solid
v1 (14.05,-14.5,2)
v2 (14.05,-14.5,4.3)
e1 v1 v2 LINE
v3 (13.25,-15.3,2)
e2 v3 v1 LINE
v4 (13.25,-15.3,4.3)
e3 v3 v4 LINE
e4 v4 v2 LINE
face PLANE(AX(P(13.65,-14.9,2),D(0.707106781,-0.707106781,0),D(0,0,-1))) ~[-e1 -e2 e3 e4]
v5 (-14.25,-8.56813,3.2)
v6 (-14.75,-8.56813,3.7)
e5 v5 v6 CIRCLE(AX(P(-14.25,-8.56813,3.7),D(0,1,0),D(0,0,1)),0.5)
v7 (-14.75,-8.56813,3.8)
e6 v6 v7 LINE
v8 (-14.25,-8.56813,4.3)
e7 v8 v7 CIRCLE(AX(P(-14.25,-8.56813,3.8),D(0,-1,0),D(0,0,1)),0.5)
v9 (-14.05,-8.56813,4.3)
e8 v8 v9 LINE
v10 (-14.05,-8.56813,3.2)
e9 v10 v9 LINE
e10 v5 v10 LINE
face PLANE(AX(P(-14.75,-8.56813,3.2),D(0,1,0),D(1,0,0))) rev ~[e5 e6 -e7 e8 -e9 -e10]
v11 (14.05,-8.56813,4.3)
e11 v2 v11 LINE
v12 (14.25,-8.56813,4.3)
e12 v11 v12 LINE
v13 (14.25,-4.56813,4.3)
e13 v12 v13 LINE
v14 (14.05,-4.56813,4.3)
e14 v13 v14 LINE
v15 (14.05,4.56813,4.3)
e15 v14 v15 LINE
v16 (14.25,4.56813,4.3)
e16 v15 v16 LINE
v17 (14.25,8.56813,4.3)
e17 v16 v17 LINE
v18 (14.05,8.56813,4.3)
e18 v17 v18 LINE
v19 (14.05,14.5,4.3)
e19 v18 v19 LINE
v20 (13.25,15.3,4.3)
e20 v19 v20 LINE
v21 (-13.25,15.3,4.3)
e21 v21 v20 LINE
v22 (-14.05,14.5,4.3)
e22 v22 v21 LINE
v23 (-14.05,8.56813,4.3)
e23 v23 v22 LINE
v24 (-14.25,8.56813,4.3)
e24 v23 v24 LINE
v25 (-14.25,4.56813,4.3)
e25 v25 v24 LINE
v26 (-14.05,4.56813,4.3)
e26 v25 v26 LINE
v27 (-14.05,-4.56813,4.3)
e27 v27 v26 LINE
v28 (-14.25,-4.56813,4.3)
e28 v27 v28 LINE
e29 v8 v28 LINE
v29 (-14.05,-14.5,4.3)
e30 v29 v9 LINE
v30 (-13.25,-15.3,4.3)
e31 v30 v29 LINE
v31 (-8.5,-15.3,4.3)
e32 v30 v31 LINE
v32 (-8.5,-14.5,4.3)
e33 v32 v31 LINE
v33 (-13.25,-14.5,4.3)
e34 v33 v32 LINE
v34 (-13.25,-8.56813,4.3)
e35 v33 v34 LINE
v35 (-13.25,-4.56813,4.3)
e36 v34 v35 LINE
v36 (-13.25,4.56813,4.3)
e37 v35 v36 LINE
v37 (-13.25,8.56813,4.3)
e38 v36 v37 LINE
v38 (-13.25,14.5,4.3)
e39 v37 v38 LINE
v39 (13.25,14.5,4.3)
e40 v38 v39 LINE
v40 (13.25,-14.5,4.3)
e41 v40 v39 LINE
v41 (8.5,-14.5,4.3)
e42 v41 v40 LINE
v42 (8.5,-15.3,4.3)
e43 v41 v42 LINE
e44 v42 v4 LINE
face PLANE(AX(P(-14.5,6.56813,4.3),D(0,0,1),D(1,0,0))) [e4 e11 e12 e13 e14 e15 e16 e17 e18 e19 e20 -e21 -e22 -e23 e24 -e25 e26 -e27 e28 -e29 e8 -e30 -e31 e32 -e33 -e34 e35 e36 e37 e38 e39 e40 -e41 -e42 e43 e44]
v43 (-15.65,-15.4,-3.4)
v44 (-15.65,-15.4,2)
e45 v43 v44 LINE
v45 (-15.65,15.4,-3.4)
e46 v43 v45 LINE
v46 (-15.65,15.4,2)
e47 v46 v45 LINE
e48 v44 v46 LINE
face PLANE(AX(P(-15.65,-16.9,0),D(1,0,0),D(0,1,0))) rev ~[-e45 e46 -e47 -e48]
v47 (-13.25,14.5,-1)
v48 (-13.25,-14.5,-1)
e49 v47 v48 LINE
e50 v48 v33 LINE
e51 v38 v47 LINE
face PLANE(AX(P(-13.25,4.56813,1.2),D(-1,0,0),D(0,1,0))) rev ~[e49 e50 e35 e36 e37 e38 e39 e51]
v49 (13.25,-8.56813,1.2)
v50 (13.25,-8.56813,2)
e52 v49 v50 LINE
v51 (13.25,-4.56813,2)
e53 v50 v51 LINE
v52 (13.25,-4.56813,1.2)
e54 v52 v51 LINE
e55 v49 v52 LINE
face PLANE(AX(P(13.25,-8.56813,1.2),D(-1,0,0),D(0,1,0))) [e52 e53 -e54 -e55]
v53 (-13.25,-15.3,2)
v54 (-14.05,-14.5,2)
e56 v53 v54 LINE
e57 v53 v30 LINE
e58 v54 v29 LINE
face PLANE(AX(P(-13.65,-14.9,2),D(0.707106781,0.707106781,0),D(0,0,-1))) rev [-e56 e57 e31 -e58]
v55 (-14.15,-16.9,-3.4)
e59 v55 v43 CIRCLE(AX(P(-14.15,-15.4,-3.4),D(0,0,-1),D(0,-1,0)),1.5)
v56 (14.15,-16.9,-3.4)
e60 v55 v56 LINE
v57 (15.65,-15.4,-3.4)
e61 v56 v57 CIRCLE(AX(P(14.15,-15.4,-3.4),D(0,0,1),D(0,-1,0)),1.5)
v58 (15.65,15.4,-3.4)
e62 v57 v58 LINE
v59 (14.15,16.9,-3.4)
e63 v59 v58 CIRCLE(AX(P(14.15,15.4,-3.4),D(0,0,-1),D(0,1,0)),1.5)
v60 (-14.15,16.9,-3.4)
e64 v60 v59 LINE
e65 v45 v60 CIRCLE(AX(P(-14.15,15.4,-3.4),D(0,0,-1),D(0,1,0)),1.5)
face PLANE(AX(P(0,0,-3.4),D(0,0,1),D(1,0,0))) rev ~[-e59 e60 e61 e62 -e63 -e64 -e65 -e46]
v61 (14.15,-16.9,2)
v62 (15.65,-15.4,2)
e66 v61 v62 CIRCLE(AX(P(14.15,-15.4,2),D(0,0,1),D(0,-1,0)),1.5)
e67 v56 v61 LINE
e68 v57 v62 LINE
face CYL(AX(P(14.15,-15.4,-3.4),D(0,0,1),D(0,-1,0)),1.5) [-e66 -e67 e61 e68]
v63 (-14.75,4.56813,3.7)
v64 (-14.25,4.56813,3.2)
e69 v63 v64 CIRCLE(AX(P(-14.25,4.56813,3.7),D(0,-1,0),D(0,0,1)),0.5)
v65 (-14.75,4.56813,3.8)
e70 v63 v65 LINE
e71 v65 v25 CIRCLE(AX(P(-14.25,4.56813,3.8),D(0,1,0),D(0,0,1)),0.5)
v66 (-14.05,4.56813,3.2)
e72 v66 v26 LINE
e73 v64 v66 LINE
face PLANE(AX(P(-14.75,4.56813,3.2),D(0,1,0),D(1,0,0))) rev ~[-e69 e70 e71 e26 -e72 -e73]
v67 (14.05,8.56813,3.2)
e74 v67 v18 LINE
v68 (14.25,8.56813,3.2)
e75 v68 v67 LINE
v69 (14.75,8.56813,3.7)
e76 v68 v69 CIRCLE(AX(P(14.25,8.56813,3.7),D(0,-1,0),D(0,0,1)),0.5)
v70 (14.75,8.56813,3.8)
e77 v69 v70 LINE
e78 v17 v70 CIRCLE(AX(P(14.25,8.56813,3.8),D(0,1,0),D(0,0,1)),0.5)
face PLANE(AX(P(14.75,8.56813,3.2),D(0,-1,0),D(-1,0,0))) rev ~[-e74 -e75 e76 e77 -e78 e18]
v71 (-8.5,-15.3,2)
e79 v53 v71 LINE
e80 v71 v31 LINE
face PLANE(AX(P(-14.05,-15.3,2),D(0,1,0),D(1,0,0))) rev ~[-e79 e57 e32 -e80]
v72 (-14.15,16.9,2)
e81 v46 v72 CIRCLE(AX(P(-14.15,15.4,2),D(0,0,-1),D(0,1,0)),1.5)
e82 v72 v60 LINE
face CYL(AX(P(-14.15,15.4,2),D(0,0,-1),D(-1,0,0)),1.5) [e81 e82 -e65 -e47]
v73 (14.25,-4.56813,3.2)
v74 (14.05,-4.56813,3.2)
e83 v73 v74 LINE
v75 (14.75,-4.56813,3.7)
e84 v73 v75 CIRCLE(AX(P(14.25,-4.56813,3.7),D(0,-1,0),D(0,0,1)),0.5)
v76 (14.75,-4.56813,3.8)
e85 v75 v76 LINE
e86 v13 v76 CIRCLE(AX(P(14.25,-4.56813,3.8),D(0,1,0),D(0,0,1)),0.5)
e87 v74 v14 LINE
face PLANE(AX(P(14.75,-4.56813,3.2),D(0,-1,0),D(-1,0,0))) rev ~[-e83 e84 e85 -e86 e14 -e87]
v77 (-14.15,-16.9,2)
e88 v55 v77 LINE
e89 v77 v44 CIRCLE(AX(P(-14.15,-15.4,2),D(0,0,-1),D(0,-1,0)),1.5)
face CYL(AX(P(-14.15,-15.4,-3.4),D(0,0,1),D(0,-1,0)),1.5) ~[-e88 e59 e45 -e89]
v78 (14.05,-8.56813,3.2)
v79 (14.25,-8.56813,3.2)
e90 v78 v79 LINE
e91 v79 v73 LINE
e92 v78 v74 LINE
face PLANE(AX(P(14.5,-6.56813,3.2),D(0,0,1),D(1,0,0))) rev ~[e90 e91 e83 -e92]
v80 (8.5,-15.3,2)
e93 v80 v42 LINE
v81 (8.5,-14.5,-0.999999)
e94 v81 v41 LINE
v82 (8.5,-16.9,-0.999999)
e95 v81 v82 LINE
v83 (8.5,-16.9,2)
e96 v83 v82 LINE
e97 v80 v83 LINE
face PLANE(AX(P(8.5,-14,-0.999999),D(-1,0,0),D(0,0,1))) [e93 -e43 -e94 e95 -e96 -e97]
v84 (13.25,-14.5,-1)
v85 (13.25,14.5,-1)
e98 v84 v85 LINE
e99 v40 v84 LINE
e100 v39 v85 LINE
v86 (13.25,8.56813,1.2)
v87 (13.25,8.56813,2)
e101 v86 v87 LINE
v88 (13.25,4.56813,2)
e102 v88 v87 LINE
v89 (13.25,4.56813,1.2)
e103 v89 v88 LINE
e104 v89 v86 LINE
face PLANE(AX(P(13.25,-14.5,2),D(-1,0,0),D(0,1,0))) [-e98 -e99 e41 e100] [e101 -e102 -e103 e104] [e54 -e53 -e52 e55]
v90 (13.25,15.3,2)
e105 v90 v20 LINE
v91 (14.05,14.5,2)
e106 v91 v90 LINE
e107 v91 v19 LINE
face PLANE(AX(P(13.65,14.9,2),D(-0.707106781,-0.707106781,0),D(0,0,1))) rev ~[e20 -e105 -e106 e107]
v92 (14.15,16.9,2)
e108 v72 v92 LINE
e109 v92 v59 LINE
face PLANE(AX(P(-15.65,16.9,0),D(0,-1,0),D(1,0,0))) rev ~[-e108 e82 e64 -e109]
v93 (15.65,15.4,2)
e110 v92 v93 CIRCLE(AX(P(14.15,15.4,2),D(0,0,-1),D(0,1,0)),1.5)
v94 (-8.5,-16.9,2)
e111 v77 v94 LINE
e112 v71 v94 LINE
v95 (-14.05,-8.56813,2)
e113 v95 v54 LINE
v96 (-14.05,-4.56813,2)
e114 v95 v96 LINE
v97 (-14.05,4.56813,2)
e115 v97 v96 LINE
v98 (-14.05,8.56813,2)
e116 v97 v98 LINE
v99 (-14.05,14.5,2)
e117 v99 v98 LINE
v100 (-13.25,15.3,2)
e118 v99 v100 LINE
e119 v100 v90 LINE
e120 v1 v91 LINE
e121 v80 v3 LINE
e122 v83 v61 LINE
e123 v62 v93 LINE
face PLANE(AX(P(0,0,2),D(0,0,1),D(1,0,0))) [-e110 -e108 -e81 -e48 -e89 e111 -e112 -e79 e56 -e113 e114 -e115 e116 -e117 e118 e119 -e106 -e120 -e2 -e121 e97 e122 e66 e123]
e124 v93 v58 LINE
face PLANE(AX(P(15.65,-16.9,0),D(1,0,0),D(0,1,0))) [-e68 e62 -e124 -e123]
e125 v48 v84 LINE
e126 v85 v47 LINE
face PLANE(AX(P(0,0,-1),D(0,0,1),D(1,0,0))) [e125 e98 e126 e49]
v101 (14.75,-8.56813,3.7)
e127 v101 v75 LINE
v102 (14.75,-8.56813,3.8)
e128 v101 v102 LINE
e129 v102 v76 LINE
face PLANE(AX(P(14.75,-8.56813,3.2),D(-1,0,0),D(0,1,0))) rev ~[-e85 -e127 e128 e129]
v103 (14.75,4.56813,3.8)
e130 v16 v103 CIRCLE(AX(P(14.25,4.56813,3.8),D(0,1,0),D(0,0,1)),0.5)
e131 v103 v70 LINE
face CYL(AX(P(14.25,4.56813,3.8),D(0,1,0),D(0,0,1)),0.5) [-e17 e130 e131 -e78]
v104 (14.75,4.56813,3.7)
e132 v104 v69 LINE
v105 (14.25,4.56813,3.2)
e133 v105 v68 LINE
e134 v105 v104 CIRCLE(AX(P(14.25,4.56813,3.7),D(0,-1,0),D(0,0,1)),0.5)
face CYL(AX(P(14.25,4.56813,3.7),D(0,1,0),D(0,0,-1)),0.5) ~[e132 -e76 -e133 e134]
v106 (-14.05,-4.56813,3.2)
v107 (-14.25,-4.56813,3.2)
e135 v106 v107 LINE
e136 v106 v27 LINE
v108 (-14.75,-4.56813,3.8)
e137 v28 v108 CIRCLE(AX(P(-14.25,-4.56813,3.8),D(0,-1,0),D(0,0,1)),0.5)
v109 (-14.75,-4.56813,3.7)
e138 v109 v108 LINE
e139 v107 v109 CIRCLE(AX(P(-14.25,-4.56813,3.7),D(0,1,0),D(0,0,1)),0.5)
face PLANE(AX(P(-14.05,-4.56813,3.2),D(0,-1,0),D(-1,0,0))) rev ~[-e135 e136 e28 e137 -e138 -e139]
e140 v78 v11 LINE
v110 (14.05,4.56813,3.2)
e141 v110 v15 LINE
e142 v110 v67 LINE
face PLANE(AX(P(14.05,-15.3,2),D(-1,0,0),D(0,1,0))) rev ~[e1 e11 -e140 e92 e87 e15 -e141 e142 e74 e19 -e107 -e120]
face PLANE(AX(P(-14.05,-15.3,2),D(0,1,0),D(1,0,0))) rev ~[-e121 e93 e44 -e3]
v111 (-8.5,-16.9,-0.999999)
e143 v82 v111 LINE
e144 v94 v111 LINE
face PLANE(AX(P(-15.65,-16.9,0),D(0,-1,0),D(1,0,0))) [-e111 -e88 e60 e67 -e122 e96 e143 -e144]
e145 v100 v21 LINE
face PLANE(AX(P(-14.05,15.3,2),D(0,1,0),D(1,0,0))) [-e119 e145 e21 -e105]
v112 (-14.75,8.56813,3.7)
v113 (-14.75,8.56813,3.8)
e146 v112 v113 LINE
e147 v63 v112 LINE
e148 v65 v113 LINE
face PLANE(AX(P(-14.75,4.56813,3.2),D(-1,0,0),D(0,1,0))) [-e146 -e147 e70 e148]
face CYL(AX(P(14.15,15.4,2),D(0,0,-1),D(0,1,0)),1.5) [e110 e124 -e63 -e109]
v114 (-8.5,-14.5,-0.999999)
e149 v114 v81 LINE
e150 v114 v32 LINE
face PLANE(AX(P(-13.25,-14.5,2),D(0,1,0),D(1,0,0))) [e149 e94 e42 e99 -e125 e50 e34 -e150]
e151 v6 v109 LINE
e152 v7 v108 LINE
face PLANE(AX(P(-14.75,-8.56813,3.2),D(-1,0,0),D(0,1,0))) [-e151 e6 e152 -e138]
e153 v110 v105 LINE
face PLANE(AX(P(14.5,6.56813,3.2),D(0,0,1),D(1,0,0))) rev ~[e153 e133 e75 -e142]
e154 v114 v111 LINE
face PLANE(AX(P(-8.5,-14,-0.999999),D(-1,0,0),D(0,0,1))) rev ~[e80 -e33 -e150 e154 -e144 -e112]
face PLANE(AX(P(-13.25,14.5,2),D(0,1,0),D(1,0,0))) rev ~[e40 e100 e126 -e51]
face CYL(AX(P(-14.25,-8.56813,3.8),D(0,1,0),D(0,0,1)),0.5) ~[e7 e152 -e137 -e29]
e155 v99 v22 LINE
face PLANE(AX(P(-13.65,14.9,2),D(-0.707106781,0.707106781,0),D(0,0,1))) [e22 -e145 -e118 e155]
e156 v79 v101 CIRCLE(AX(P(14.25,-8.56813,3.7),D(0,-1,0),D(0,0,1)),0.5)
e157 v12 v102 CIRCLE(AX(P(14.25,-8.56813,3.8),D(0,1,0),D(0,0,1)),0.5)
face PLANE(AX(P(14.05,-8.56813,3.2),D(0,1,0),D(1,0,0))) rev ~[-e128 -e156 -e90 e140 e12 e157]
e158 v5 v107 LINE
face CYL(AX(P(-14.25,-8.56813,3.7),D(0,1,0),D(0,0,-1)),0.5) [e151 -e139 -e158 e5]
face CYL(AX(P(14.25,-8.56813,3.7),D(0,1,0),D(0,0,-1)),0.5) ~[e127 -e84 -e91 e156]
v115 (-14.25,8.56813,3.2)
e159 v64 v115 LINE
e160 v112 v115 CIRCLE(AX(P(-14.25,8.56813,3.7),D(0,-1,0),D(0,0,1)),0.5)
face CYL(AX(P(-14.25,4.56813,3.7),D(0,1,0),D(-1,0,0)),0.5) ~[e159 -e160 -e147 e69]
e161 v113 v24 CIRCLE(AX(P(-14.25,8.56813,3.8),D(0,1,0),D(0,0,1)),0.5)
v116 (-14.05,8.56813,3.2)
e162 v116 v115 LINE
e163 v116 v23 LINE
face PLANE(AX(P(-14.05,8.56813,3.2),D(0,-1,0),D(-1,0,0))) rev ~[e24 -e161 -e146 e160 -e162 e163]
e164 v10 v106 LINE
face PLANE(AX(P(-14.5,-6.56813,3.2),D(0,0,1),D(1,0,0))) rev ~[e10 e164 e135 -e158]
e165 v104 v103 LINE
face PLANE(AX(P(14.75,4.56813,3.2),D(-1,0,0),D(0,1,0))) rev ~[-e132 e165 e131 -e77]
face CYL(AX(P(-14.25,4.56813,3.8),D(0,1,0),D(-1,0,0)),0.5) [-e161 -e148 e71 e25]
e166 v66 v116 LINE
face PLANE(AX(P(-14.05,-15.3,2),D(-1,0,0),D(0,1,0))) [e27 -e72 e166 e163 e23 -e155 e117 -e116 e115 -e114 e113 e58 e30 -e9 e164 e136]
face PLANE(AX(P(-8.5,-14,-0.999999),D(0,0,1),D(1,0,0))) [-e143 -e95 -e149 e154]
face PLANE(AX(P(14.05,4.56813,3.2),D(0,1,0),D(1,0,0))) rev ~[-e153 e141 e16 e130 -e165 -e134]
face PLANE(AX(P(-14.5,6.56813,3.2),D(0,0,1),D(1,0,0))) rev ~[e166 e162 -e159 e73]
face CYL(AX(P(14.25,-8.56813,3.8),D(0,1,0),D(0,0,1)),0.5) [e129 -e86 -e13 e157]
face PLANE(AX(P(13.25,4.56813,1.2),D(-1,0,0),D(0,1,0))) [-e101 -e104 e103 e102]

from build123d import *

# Parameters (mm, degrees)
F1_START      = -1
F0_W          = 16
F0_H          = 2.4
F0_W_2        = 2.4
F0_H_2        = 16
F1_DEPTH      = 2.4
F0_W_3        = 31.3
F0_H_3        = 33.8
F2_DEPTH      = 2
F2_DEPTH_BACK = 3.4
F4_W          = 28.1
F4_H          = 30.6
F4_W_2        = 26.5
F4_H_2        = 29
F5_DEPTH      = 2.3
F6_START      = 1.2
F3_W          = 0.8
F3_H          = 4
F3_W_2        = 0.2
F3_W_3        = 0.5
F6_DEPTH      = 0.8
F7_START      = 2
F7_DEPTH      = 2.3
F8_START      = 3.2
F8_DEPTH      = 1.1
F9_R          = 0.5
F11_START     = 14
F10_W         = 17
F10_H         = 7
F11_DEPTH     = 4
F12_R         = 1.5
F14_SIZE      = 0.8


# Not quite as in the source:
# - a feature names something its author has since deleted; it is built from what else it names


with BuildPart() as f1:
    # F0 (on Top) → F1 (new body)
    with BuildSketch(Plane.XY.offset(F1_START)):
        Polygon((-8, 14.5), (-13.25, 14.5), (-13.25, 8), (-10.85, 8), (-10.85, -8), (-13.25, -8), (-13.25, -14.5), (-8, -14.5), (-8, -12.1), (8, -12.1), (8, -14.5), (13.25, -14.5), (13.25, -8), (10.85, -8), (10.85, 8), (13.25, 8), (13.25, 14.5), (8, 14.5), (8, 12.1), (-8, 12.1), align=None)
        with Locations((0, -13.3)):
            Rectangle(F0_W, F0_H)
        with Locations((-12.05, 0)):
            Rectangle(F0_W_2, F0_H_2)
        with Locations((12.05, 0)):
            Rectangle(F0_W_2, F0_H_2)
        with Locations((0, 13.3)):
            Rectangle(F0_W, F0_H)
    extrude(amount=-F1_DEPTH)

    # F0 (on Top) → F2 (join, two sides)
    with BuildSketch(Plane.XY) as f2_sk:
        Rectangle(F0_W_3, F0_H_3)
        Polygon((-13.25, 8), (-13.25, 14.5), (-8, 14.5), (8, 14.5), (13.25, 14.5), (13.25, 8), (13.25, -8), (13.25, -14.5), (8, -14.5), (-8, -14.5), (-13.25, -14.5), (-13.25, -8), align=None, mode=Mode.SUBTRACT)
    extrude(amount=F2_DEPTH)
    extrude(f2_sk.sketch, amount=-F2_DEPTH_BACK)

    # F4 (on face) → F5 (join)
    with BuildSketch(Plane.XY.offset(2)):
        Rectangle(F4_W, F4_H)
        Rectangle(F4_W_2, F4_H_2, mode=Mode.SUBTRACT)
    extrude(amount=F5_DEPTH)

    # F3 (on Top) → F6 (join)
    with BuildSketch(Plane.XY.offset(F6_START)):
        with Locations((-13.6500000894, 6.5681297779)):
            Rectangle(F3_W, F3_H)
        with Locations((-14.1500000894, 6.5681297779)):
            Rectangle(F3_W_2, F3_H)
        with Locations((-14.5000000894, 6.5681297779)):
            Rectangle(F3_W_3, F3_H)
        with Locations((13.6499995038, 6.5681299639)):
            Rectangle(F3_W, F3_H)
        with Locations((14.1499995038, 6.5681299639)):
            Rectangle(F3_W_2, F3_H)
        with Locations((14.4999995038, 6.5681299639)):
            Rectangle(F3_W_3, F3_H)
        with Locations((-14.1500000894, -6.5681295022)):
            Rectangle(F3_W_2, F3_H)
        with Locations((-14.5000000894, -6.5681295022)):
            Rectangle(F3_W_3, F3_H)
        with Locations((-13.6500000894, -6.5681295022)):
            Rectangle(F3_W, F3_H)
        with Locations((14.1499995038, -6.5681295022)):
            Rectangle(F3_W_2, F3_H)
        with Locations((14.4999995038, -6.5681295022)):
            Rectangle(F3_W_3, F3_H)
        with Locations((13.6499995038, -6.5681295022)):
            Rectangle(F3_W, F3_H)
    extrude(amount=F6_DEPTH)

    # F3 (on Top) → F7 (join)
    with BuildSketch(Plane.XY.offset(F7_START)):
        with Locations((-13.6500000894, -6.5681295022)):
            Rectangle(F3_W, F3_H)
        with Locations((-13.6500000894, 6.5681297779)):
            Rectangle(F3_W, F3_H)
        with Locations((13.6499995038, -6.5681295022)):
            Rectangle(F3_W, F3_H)
        with Locations((13.6499995038, 6.5681299639)):
            Rectangle(F3_W, F3_H)
    extrude(amount=F7_DEPTH)

    # F3 (on Top) → F8 (join)
    with BuildSketch(Plane.XY.offset(F8_START)):
        with Locations((-14.5000000894, 6.5681297779)):
            Rectangle(F3_W_3, F3_H)
        with Locations((-14.1500000894, 6.5681297779)):
            Rectangle(F3_W_2, F3_H)
        with Locations((-14.5000000894, -6.5681295022)):
            Rectangle(F3_W_3, F3_H)
        with Locations((-14.1500000894, -6.5681295022)):
            Rectangle(F3_W_2, F3_H)
        with Locations((14.4999995038, 6.5681299639)):
            Rectangle(F3_W_3, F3_H)
        with Locations((14.1499995038, 6.5681299639)):
            Rectangle(F3_W_2, F3_H)
        with Locations((14.4999995038, -6.5681295022)):
            Rectangle(F3_W_3, F3_H)
        with Locations((14.1499995038, -6.5681295022)):
            Rectangle(F3_W_2, F3_H)
    extrude(amount=F8_DEPTH)

    # F9
    f9_edges = [f1.edges().sort_by_distance(p)[0] for p in [
        (13.25, 6.56813, 1.2),
        (14.75, 6.56813, 3.2),
        (-14.75, 6.56813, 3.2),
        (-14.75, 6.56813, 4.3),
        (14.75, -6.56813, 4.3),
        (14.75, -6.56813, 3.2),
        (13.25, -6.56813, 1.2),
        (-14.75, -6.56813, 4.3),
        (-14.75, -6.56813, 3.2),
        (14.75, 6.56813, 4.3),
    ]]
    fillet(f9_edges, radius=F9_R)

    # F10 (on Front) → F11 (cut)
    with BuildSketch(Plane.XZ.offset(F11_START)):
        with Locations((-4.619e-07, 2.5000009835)):
            Rectangle(F10_W, F10_H)
    extrude(amount=F11_DEPTH, mode=Mode.SUBTRACT)

    # F12
    f12_edges = [f1.edges().sort_by_distance(p)[0] for p in [
        (15.65, -16.9, -0.7),
        (15.65, 16.9, -0.7),
        (-15.65, 16.9, -0.7),
        (-15.65, -16.9, -0.7),
    ]]
    fillet(f12_edges, radius=F12_R)

    # F14
    f14_edges = [f1.edges().sort_by_distance(p)[0] for p in [
        (-14.05, 15.3, 3.15),
        (14.05, 15.3, 3.15),
        (-14.05, -15.3, 3.15),
        (14.05, -15.3, 3.15),
    ]]
    chamfer(f14_edges, length=F14_SIZE)


solid = f1.part
